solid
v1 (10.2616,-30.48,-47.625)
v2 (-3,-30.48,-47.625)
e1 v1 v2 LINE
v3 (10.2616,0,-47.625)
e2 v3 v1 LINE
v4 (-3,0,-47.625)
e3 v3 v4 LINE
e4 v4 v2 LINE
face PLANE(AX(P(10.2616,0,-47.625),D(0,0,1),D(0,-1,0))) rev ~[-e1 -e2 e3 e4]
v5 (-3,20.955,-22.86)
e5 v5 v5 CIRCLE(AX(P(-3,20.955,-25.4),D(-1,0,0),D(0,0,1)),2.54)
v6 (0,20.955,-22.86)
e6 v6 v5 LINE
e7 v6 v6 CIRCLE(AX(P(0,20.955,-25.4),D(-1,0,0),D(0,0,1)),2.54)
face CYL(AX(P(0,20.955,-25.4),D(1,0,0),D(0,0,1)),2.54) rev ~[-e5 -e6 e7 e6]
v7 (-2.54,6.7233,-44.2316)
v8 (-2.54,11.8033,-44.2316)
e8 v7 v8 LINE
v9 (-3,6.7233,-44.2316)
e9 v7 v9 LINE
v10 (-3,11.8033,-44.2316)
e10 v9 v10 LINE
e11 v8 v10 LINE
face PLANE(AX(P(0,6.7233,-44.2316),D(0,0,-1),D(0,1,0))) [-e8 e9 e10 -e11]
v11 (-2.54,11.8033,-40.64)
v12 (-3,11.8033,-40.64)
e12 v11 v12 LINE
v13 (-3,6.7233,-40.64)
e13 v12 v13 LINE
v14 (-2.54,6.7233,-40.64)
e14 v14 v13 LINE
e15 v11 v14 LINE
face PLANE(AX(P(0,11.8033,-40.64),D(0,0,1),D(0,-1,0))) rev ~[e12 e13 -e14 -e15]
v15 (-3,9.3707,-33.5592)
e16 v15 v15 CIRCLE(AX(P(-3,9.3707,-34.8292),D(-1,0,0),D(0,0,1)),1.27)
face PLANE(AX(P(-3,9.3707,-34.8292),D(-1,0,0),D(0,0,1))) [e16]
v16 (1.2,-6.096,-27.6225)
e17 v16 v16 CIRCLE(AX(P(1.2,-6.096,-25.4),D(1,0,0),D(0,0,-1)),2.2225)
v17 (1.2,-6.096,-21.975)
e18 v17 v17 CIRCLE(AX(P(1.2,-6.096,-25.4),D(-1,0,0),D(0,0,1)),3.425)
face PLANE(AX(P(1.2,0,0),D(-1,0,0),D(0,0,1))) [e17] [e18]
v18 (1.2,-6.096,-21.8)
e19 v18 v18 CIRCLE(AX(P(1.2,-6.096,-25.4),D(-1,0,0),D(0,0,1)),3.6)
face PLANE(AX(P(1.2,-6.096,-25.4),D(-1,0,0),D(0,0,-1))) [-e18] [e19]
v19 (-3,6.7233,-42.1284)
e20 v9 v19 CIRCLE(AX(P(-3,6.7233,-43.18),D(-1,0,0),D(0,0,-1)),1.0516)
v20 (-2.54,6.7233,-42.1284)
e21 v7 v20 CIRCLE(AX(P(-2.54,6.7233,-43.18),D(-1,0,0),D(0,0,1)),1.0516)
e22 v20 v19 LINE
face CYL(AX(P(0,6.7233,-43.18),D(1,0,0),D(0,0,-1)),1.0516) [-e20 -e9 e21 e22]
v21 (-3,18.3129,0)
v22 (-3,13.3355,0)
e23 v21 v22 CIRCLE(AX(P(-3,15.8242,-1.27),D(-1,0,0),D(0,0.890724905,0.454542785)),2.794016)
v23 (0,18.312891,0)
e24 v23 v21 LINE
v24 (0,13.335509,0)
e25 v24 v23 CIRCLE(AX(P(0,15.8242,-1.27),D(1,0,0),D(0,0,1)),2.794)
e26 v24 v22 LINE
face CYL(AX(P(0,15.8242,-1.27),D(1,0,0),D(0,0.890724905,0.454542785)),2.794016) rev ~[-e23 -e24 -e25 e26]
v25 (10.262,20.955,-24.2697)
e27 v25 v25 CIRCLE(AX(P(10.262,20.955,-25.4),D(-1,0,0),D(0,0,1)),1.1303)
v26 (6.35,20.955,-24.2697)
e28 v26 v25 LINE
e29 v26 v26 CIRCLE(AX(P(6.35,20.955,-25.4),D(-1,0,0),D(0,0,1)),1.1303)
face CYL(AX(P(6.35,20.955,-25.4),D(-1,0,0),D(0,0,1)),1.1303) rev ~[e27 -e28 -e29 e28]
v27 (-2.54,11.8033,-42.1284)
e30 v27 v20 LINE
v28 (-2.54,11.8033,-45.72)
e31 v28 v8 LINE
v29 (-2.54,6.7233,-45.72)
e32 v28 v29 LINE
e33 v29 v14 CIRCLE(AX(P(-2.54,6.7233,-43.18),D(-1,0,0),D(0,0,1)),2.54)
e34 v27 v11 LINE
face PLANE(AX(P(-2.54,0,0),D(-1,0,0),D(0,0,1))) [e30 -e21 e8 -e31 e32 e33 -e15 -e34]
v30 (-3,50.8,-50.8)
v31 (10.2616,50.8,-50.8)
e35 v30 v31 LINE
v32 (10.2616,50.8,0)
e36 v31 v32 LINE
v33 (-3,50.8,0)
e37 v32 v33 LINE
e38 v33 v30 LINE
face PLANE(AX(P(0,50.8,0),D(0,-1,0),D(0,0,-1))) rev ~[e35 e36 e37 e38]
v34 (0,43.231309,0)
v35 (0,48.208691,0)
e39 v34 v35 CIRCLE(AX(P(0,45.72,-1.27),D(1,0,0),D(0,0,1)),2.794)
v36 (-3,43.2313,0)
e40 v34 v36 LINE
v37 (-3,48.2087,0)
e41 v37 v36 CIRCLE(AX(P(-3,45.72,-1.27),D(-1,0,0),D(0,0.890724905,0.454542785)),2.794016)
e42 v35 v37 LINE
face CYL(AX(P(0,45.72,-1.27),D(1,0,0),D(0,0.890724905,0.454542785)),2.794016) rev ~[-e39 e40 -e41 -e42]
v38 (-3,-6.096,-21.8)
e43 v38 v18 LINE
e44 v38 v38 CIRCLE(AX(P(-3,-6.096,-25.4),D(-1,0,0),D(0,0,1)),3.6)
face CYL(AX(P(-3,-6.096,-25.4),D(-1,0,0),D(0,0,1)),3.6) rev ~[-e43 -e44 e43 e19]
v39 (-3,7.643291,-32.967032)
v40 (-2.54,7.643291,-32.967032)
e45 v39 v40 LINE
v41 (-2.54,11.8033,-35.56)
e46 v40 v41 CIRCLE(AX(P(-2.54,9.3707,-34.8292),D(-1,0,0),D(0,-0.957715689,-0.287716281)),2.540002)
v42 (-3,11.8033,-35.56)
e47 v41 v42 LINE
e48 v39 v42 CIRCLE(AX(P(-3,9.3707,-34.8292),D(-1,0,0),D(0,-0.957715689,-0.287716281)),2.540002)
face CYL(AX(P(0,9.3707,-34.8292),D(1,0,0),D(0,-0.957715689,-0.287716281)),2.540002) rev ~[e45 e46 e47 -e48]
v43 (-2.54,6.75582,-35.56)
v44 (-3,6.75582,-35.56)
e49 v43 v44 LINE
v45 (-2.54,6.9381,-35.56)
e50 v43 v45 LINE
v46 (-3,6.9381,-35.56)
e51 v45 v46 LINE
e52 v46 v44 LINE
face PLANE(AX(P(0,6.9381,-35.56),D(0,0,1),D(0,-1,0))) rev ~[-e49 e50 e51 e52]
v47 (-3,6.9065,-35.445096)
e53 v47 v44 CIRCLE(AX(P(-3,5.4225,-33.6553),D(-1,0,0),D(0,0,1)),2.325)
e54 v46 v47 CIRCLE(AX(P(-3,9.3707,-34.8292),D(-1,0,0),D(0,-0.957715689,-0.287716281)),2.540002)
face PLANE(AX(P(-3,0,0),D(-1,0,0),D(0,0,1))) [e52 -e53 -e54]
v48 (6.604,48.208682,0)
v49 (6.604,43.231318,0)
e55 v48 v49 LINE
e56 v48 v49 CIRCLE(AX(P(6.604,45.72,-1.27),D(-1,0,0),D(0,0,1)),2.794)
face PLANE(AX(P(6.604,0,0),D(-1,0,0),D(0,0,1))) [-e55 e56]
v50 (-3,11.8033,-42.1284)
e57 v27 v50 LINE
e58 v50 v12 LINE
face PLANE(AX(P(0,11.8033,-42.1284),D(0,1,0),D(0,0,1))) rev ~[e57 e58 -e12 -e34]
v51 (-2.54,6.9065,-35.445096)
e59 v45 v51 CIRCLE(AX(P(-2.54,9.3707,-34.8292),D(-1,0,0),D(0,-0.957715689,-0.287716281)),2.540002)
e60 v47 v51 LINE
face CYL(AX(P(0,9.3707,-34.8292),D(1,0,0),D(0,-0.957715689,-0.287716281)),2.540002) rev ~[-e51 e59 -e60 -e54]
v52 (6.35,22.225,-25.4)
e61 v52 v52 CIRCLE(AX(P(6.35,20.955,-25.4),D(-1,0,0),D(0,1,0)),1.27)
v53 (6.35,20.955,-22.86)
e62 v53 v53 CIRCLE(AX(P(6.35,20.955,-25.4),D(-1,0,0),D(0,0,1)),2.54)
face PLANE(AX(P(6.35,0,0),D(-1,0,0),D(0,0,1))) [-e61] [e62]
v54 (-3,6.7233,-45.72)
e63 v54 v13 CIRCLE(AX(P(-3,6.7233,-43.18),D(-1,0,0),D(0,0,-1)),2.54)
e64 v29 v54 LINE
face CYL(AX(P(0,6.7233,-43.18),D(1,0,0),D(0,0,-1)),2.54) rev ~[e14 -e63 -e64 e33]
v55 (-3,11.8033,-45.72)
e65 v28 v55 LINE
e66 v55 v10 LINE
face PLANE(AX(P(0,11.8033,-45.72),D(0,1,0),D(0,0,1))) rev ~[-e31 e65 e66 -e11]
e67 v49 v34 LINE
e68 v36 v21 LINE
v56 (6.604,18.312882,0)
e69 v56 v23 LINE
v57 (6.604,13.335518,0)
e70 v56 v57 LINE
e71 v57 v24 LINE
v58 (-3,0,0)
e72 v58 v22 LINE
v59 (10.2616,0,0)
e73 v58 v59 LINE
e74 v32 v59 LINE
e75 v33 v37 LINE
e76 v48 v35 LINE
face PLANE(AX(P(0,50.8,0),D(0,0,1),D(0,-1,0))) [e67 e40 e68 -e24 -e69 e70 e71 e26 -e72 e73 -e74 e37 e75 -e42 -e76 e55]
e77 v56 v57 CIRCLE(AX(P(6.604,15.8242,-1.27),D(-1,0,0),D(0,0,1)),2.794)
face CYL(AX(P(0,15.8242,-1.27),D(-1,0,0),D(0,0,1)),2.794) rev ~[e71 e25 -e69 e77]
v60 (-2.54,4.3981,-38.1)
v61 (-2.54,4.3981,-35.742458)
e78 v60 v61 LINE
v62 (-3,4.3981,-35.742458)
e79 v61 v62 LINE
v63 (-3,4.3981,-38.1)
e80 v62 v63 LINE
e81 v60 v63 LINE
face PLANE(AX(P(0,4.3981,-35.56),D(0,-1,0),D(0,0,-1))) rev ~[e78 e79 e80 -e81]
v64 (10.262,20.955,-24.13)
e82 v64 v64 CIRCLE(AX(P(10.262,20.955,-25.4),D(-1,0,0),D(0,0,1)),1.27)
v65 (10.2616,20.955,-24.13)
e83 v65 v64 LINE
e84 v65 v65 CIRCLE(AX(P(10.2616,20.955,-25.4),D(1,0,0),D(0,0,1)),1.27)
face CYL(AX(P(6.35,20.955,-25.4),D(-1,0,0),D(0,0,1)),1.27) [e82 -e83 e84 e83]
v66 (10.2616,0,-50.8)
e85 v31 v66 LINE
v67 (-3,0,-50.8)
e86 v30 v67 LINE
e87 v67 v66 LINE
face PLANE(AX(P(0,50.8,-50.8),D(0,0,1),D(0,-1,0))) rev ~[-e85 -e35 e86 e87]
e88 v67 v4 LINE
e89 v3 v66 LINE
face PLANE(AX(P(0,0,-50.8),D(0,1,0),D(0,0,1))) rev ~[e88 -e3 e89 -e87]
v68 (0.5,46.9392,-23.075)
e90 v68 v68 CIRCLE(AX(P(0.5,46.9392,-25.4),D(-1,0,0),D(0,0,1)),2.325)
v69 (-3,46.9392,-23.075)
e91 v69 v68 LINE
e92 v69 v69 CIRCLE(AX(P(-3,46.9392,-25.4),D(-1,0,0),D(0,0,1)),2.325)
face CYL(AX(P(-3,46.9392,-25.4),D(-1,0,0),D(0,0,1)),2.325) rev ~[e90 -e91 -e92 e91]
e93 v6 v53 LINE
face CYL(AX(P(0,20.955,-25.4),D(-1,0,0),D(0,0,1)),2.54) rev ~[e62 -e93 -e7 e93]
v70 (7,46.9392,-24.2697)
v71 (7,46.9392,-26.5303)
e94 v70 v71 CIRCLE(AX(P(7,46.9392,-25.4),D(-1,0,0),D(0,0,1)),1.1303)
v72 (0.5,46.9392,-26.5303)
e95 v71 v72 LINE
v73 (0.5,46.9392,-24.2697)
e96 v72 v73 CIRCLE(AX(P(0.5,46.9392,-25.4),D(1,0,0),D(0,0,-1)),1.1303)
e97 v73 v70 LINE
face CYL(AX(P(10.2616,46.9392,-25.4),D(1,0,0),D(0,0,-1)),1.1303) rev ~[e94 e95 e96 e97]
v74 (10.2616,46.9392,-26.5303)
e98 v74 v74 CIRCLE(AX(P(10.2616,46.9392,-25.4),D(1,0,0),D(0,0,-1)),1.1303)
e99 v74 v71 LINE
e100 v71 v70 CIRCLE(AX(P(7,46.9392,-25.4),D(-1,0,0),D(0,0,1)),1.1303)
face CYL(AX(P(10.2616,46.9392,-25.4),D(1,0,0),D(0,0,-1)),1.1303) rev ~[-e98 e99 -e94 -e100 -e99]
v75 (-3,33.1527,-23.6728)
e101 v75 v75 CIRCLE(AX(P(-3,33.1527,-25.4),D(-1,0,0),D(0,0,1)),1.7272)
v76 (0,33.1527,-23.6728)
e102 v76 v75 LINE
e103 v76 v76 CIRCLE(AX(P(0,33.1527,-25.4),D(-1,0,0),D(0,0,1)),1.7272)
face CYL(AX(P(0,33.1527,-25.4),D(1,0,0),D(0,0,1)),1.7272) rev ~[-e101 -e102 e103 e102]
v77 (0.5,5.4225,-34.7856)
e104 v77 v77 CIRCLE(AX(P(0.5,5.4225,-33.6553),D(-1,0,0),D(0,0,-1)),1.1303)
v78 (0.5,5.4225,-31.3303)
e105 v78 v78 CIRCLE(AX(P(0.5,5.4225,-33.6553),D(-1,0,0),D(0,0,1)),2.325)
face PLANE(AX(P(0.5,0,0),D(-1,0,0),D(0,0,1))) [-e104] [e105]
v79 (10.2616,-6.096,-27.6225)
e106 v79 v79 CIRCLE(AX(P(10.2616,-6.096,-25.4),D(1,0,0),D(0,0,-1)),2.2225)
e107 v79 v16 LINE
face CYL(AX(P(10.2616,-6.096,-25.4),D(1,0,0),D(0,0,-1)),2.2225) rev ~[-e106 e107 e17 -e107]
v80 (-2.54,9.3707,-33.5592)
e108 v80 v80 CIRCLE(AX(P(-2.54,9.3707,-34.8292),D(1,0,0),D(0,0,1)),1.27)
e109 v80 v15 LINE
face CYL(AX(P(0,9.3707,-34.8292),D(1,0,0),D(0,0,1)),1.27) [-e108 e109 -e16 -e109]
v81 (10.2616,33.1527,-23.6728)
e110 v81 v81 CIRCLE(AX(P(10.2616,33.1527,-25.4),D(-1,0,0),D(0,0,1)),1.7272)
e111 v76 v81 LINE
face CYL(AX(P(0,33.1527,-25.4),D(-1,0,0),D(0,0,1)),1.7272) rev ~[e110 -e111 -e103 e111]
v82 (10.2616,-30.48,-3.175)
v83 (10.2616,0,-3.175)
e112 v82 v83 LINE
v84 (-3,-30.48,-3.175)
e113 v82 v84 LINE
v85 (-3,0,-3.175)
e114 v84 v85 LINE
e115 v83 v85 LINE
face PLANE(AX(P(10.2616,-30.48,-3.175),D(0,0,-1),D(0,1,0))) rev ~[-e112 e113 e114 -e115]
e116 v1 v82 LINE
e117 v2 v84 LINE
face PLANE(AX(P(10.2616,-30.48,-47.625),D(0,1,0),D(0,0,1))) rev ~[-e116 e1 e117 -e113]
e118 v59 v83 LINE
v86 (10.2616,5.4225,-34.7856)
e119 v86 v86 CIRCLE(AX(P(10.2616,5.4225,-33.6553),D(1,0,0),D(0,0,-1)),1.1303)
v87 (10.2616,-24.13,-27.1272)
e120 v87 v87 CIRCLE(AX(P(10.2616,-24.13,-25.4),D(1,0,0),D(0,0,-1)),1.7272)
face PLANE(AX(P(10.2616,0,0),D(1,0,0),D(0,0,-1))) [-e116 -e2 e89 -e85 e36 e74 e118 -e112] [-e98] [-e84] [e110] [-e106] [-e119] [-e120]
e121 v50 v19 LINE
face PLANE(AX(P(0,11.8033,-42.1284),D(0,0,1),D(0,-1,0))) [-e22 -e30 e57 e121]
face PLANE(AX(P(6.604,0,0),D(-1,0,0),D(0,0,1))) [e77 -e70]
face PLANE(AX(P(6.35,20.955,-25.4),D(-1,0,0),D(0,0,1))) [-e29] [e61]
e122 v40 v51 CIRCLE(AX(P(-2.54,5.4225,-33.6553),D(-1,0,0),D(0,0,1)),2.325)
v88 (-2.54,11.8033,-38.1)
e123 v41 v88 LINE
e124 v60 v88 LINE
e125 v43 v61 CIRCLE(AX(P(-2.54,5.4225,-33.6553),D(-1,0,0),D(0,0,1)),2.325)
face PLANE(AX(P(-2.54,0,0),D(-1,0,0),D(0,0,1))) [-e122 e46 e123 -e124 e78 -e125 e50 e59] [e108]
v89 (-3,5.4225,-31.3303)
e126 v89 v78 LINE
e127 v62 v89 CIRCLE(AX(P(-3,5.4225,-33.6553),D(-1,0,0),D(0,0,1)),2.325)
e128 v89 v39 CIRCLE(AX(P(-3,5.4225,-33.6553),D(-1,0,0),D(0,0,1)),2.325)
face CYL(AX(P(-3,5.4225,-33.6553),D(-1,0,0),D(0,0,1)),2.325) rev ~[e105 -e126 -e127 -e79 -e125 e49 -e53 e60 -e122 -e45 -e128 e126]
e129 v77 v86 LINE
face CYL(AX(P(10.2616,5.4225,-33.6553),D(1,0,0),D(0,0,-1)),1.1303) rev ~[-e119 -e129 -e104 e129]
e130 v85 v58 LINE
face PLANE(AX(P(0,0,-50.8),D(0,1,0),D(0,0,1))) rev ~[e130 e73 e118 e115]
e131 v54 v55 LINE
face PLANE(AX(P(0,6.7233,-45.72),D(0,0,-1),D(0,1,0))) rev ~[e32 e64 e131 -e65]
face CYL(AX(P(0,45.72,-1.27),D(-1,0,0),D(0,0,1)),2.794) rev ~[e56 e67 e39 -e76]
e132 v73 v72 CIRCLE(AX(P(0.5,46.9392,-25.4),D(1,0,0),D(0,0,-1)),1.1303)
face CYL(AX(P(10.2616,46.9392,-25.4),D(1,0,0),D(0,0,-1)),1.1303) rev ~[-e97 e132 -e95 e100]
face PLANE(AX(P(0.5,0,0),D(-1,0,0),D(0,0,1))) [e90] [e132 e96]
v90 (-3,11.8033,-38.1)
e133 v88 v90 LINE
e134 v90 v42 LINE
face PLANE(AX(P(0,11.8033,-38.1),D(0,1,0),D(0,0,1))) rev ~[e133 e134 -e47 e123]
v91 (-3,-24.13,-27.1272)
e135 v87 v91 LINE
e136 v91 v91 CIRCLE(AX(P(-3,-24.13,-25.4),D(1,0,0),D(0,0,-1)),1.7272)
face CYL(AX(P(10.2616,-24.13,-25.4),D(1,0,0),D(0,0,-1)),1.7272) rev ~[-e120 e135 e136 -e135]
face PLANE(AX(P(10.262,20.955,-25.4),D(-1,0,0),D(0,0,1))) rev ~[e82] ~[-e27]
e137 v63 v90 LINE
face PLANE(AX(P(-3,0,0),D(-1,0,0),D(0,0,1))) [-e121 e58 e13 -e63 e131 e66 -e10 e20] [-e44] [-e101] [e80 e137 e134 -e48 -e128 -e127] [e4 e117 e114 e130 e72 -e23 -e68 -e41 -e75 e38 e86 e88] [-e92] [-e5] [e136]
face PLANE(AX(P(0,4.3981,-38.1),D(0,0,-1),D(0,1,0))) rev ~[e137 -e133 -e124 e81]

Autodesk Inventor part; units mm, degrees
ref_plane "YZ Plane" through (0, 0, 0) normal (1, 0, 0) x (0, 1, 0)
ref_plane "XZ Plane" through (0, 0, 0) normal (0, 1, 0) x (-1, 0, 0)
ref_plane "XY Plane" through (0, 0, 0) normal (0, 0, 1) x (1, 0, 0)
sketch "Sketch1" plane through (0, 0, 0) normal (1, 0, 0) x (0, 1, 0)
  line L0 (0, 0) -> (50.8, 0)
  line L1 (50.8, 0) -> (50.8, -50.8)
  line L2 (50.8, -50.8) -> (0, -50.8)
  line L3 (0, -50.8) -> (0, 0)
  circle A0 centre (46.9392, -25.4) radius 0.889
  circle A1 centre (20.955, -25.4) radius 1.27
  line L4 (20.955, -25.4) -> (20.955, -50.8) construction
  line L5 (46.9392, -25.4) -> (46.9392, -50.8) construction
  line L6 (20.955, -25.4) -> (50.8, -25.4) construction
  line L7 (46.9392, -25.4) -> (50.8, -25.4) construction
  dimension "d0" = 50.8
  dimension "d2" = 50.8
  dimension "d3" = 25.4
  dimension "d4" = 25.4
  dimension "d5" = 29.845
  dimension "d6" = 3.8608
  dimension "d7" = 2.54
  dimension "d8" = 1.778
extrude "Extrusion1" add sketch "Sketch1" along normal blind 12.7
sketch "Sketch2" plane through (0, 0, -50.8) normal (0, -1, 0) x (1, 0, 0)
  line L0 (0, 0) -> (12.7, 0) projected
  line L1 (0, 50.8) -> (12.7, 50.8) projected
  line L2 (6.35, 50.8) -> (6.35, 40.4) construction
  line L3 (6.35, 0) -> (6.35, 10.4) construction
  circle A0 centre (6.35, 10.4) radius 3.175
  circle A1 centre (6.35, 40.4) radius 3.175
  line L4 (12.7, 50.8) -> (12.7, 0) projected
  line L5 (6.35, 40.4) -> (6.35, 10.4) construction
  dimension "d14" = 6.35
  dimension "d15" = 6.35
  dimension "d77" = 30
extrude "Extrusion2" [suppressed]
sketch "Sketch4" plane through (0, 0, 0) normal (-1, 0, 0) x (0, 0, 1)
  line L0 (0, 0) -> (0, 50.8) projected
  line L1 (0, 50.8) -> (0, 45.72) construction
  line L2 (0, 45.72) -> (-1.27, 45.72) construction
  circle A0 centre (-1.27, 45.72) radius 2.794
  line L3 (-1.27, 45.72) -> (-1.27, 15.8242) construction
  circle A1 centre (-1.27, 15.8242) radius 2.794
  dimension "d23" = 5.08
  dimension "d24" = 1.27
  dimension "d25" = 5.588
  dimension "d26" = 29.8958
  dimension "d27" = 5.588
extrude "Extrusion4" cut sketch "Sketch4" against normal blind 6.604
sketch "Sketch5" plane through (0, 0, 0) normal (-1, 0, 0) x (0, 0, 1)
  line L0 (0, 48.2087) -> (0, 50.8) projected
  line L1 (0, 50.8) -> (-50.8, 50.8) projected
  line L2 (0, 18.3129) -> (0, 43.2313) projected
  line L3 (-50.8, -12.7) -> (0, -12.7)
  line L4 (0, -12.7) -> (0, 50.8)
  line L5 (0, 50.8) -> (-50.8, 50.8)
  line L6 (-50.8, 50.8) -> (-50.8, -12.7)
  line L7 (-38.1, 4.3981) -> (-38.1, 11.8033)
  line L8 (-38.1, 4.3981) -> (-35.56, 4.3981)
  line L9 (-35.56, 4.3981) -> (-35.56, 6.9381)
  arc A0 (-35.56, 6.9381) -> (-35.56, 11.8033) centre (-34.8292, 9.3707) ccw
  line L10 (-35.56, 11.8033) -> (-38.1, 11.8033)
  line L11 (-45.72, 11.8033) -> (-45.72, 6.7233)
  line L12 (-45.72, 11.8033) -> (-40.64, 11.8033)
  line L13 (-40.64, 11.8033) -> (-40.64, 6.7233)
  circle A1 centre (-43.18, 6.7233) radius 2.54
  line L14 (-50.8, -7.7566) -> (-38.1, -7.7566) construction
  line L15 (-50.8, -3.6438) -> (-45.72, -3.6438) construction
  line L16 (-40.64, 6.7233) -> (-45.72, 6.7233) construction
  line L17 (-45.72, 11.8033) -> (-40.64, 11.8033)
  arc A2 (-40.64, 6.7233) -> (-45.72, 6.7233) centre (-43.18, 6.7233) ccw
  circle A3 centre (-25.4, 20.955) radius 1.27 projected
  circle A4 centre (-43.18, 7.6582) radius 0.935
  line L18 (-42.245, 7.6582) -> (-42.245, 11.8033)
  line L19 (-42.245, 11.8033) -> (-44.115, 11.8033)
  line L20 (-44.115, 11.8033) -> (-44.115, 7.6582)
  line L21 (-44.115, 11.8033) -> (-42.245, 11.8033)
  circle A5 centre (-34.8292, 9.3707) radius 1.27
  line L22 (-50.8, 0) -> (0, 0) projected
  dimension "d46" = 12.7
  dimension "d47" = 5.08
  dimension "d48" = 5.08
  dimension "d49" = 2.54
  dimension "d50" = 2.54
  dimension "d52" = 2.54
  dimension "d53" = 5.08
  dimension "d57" = 58.5566
  dimension "d58" = 54.4438
  dimension "d59" = 35.56
  dimension "d60" = 0
  dimension "d61" = 63.5
  dimension "d62" = 0
  dimension "d64" = 38.1
  dimension "d67" = 1.8699
  dimension "d80" = 11.8033
  dimension "d81" = 4.3981
  dimension "d82" = 11.8033
extrude "Extrusion5" add sketch "Sketch5" along normal blind 2.54 contours L7 L10 A0 L9 L8 | L12 L20 A1 L11 | A1 L20 A4 L18 | L12 L18 A1 L20 | A1 L18 L12 L13 | A1 L18 A4 L20 | A4 | A5
sketch "Sketch6" plane through (-2.54, 0, 0) normal (-1, 0, 0) x (0, 0, 1)
  arc A0 (-35.56, 6.9381) -> (-35.56, 11.8033) centre (-34.8292, 9.3707) ccw projected
  line L0 (-35.56, 11.8033) -> (-38.1, 11.8033) projected
  circle A1 centre (-34.8292, 9.3707) radius 1.27
  line L1 (-35.56, 11.8033) -> (-35.56, 6.9381)
  point P0 (0, 0)
  dimension "d68" = 2.54
extrude "Extrusion6" cut sketch "Sketch6" against normal blind 2.54 contours L1 A1 | A1 L1
sketch "Sketch7" plane through (-2.54, 0, 0) normal (-1, 0, 0) x (0, 0, 1)
  arc A0 (-45.72, 6.7233) -> (-40.64, 6.7233) centre (-43.18, 6.7233) ccw projected
  line L0 (-40.64, 11.8033) -> (-45.72, 11.8033) projected
  line L1 (-44.2316, 11.8033) -> (-42.1284, 11.8033)
  line L2 (-42.1284, 11.8033) -> (-42.1284, 6.7233)
  line L3 (-42.1284, 6.7233) -> (-44.2316, 6.7233)
  line L4 (-44.2316, 6.7233) -> (-44.2316, 11.8033)
  circle A1 centre (-43.18, 6.7233) radius 1.0516
  point P0 (0, 0)
  dimension "d71" = 2.1033
extrude "Extrusion7" cut sketch "Sketch7" against normal blind 2.54
sketch "Sketch8" plane through (12.7, 0, 0) normal (1, 0, 0) x (0, 0, -1)
  circle A0 centre (25.4, 20.955) radius 1.27 projected
  circle A1 centre (25.4, 46.9392) radius 0.889 projected
  line L0 (0, 50.8) -> (0, 0) projected
  line L1 (0, 0) -> (50.8, 0) projected
  line L2 (0, 50.8) -> (50.8, 50.8)
  line L3 (50.8, 50.8) -> (50.8, 0)
  line L4 (50.8, 0) -> (0, 0)
  line L5 (0, 0) -> (0, 50.8)
extrude "Extrusion8" cut sketch "Sketch8" against normal blind 2.4384
sketch "Sketch9" plane through (10.2616, 0, 0) normal (1, 0, 0) x (0, 0, -1)
  circle A0 centre (25.4, 20.955) radius 1.27 projected
  circle A1 centre (25.4, 46.9392) radius 0.889 projected
  line L0 (0, 0) -> (0, 50.8) projected
  line L1 (50.8, 0) -> (0, 0) projected
  line L2 (50.8, 50.8) -> (50.8, 0) projected
  line L3 (0, 50.8) -> (50.8, 50.8) projected
  circle A2 centre (25.4, 46.9392) radius 0.889
sketch "Sketch12" plane through (0, 50.8, 0) normal (0, 1, 0) x (1, 0, 0)
  line L0 (10.2616, 0) -> (10.2616, 50.8) projected
  line L1 (10.2616, 15.875) -> (10.2616, 34.925)
  line L2 (10.2616, 34.925) -> (0, 34.925)
  line L3 (0, 34.925) -> (0, 15.875)
  line L4 (0, 15.875) -> (10.2616, 15.875)
  line L5 (10.2616, 15.875) -> (0, 34.925) construction
  line L6 (10.2616, 34.925) -> (0, 15.875) construction
  point P0 (5.1308, 25.4)
  dimension "d84" = 19.05
extrude "Extrusion9" add sketch "Sketch12" along normal blind 25.4
sketch "Sketch14" plane through (0, 0, 0) normal (-1, 0, 0) x (0, 0, 1)
  line L0 (-44.2316, 6.7233) -> (-44.2316, 11.8033) projected
  line L1 (-22.86, 55.5625) -> (-22.86, 71.4375)
  line L2 (-22.86, 71.4375) -> (-27.94, 71.4375)
  line L3 (-27.94, 71.4375) -> (-27.94, 55.5625)
  line L4 (-27.94, 55.5625) -> (-22.86, 55.5625)
  line L5 (-22.86, 55.5625) -> (-27.94, 71.4375) construction
  line L6 (-22.86, 71.4375) -> (-27.94, 55.5625) construction
  circle A0 centre (-25.4, 71.4375) radius 2.54
  circle A1 centre (-25.4, 55.5625) radius 2.54
  line L7 (-15.875, 50.8) -> (-15.875, 76.2) projected
  point P0 (-25.4, 63.5)
  dimension "d87" = 5.08
  dimension "d88" = 15.875
  dimension "d91" = 9.525
extrude "Extrusion10" cut sketch "Sketch14" against normal blind 25.4
sketch "Sketch15" plane through (0, 0, 0) normal (-1, 0, 0) x (0, 0, 1)
  circle A0 centre (-25.4, 20.955) radius 1.27 projected
  circle A1 centre (-25.4, 20.955) radius 2.54
  dimension "d92" = 5.08
extrude "Extrusion11" cut sketch "Sketch15" against normal blind 6.35
sketch "Sketch16" plane through (10.2616, 0, 0) normal (1, 0, 0) x (0, 0, -1)
  circle A0 centre (25.4, 20.955) radius 1.27 projected
  circle A1 centre (25.4, 46.9392) radius 0.889 projected
  circle A2 centre (33.6553, 5.4225) radius 0.889
  dimension "d99" = 17.59
  dimension "d100" = 1.778
  dimension "d103" = 207.99
extrude "Extrusion12" cut sketch "Sketch16" against normal up to next contours A2
sketch "Sketch17" plane through (0, 0, 0) normal (-1, 0, 0) x (0, 0, 1)
  circle A0 centre (-33.6553, 5.4225) radius 0.889 projected
  circle A1 centre (-25.4, 20.955) radius 2.54 projected
  line L0 (-22.86, 71.4375) -> (-22.86, 55.5625) projected
  arc A2 (-27.94, 55.5625) -> (-22.86, 55.5625) centre (-25.4, 55.5625) ccw projected
  line L1 (-27.94, 55.5625) -> (-27.94, 71.4375) projected
  arc A3 (-22.86, 71.4375) -> (-27.94, 71.4375) centre (-25.4, 71.4375) ccw projected
  line L2 (-45.72, 11.8033) -> (-44.2316, 11.8033) projected
  line L3 (-44.2316, 6.7233) -> (-44.2316, 11.8033) projected
  arc A4 (-44.2316, 6.7233) -> (-42.1284, 6.7233) centre (-43.18, 6.7233) ccw projected
  line L4 (-42.1284, 11.8033) -> (-42.1284, 6.7233) projected
  line L5 (-42.1284, 11.8033) -> (-40.64, 11.8033) projected
  line L6 (-40.64, 11.8033) -> (-40.64, 6.7233) projected
  arc A5 (-45.72, 6.7233) -> (-40.64, 6.7233) centre (-43.18, 6.7233) ccw projected
  line L7 (-45.72, 6.7233) -> (-45.72, 11.8033) projected
  line L8 (-38.1, 11.8033) -> (-35.56, 11.8033) projected
  arc A6 (-35.56, 6.9381) -> (-35.56, 11.8033) centre (-34.8292, 9.3707) ccw projected
  line L9 (-35.56, 6.9381) -> (-35.56, 4.3981) projected
  line L10 (-35.56, 4.3981) -> (-38.1, 4.3981) projected
  line L11 (-38.1, 4.3981) -> (-38.1, 11.8033) projected
  arc A7 (0, 48.2087) -> (0, 43.2313) centre (-1.27, 45.72) ccw projected
  line L12 (0, 50.8) -> (-15.875, 50.8) projected
  line L13 (-34.925, 50.8) -> (-34.925, 76.2) projected
  line L14 (-34.925, 50.8) -> (-50.8, 50.8) projected
  line L15 (-50.8, 50.8) -> (-50.8, 0) projected
  line L16 (-50.8, 0) -> (0, 0) projected
  line L17 (0, 0) -> (0, 13.3355) projected
  arc A8 (0, 18.3129) -> (0, 13.3355) centre (-1.27, 15.8242) ccw projected
  circle A9 centre (-25.4, 46.9392) radius 0.889 projected
  line L18 (-34.925, 50.8) -> (-34.925, 76.2)
  line L19 (-15.875, 76.2) -> (-34.925, 76.2)
  line L20 (-15.875, 76.2) -> (-15.875, 50.8)
  line L21 (-15.875, 50.8) -> (0, 50.8)
  line L22 (0, 50.8) -> (0, 48.2087)
  arc A10 (0, 48.2087) -> (0, 43.2313) centre (-1.27, 45.72) ccw
  arc A11 (0, 18.3129) -> (0, 13.3355) centre (-1.27, 15.8242) ccw
  line L23 (0, 43.2313) -> (0, 18.3129)
  line L24 (0, 13.3355) -> (0, 0)
  line L25 (0, 0) -> (-50.8, 0)
  line L26 (-50.8, 0) -> (-50.8, 50.8)
  line L27 (-50.8, 50.8) -> (-34.925, 50.8)
  circle A12 centre (-25.4, 46.9392) radius 0.889
  circle A13 centre (-25.4, 20.955) radius 2.54
  circle A14 centre (-25.4, 33.1527) radius 1.7272
  dimension "d104" = 3.4544
extrude "Extrusion13" add sketch "Sketch17" along normal blind 3
sketch "Sketch18" plane through (0, 33.1527, -25.4) normal (-1, 0, 0) x (0, 0, 1)
  circle A0 centre (0, 0) radius 1.7272 projected
  circle A1 centre (0, 0) radius 1.7272
  point P0 (25.4, -33.1527)
extrude "Extrusion14" cut sketch "Sketch18" against normal up to surface (10.2616 mm away)
sketch "Sketch20" plane through (10.2616, 0, 0) normal (1, 0, 0) x (0, 0, -1)
  circle A0 centre (25.4, 33.1527) radius 1.7272 projected
  circle A1 centre (25.4, -6.096) radius 2.2225
  line L0 (0, 0) -> (0, 50.8) projected
  line L1 (50.8, 0) -> (0, 0) projected
  line L2 (3.175, 0) -> (47.625, 0)
  line L3 (47.625, 0) -> (47.625, -30.48)
  line L4 (47.625, -30.48) -> (3.175, -30.48)
  line L5 (3.175, -30.48) -> (3.175, 0)
  dimension "d111" = 4.445
  dimension "d114" = 0
  dimension "d117" = 6.096
  dimension "d118" = 44.45
  dimension "d119" = 30.48
  dimension "d120" = 3.175
extrude "Extrusion16" add sketch "Sketch20" against normal up to surface (13.2616 mm away) contours L3 L4 L5 L1
sketch "Sketch21" plane through (10.2616, 0, 0) normal (1, 0, 0) x (0, 0, -1)
  line L0 (22.86, 55.5625) -> (22.86, 71.4375) projected
  arc A0 (27.94, 71.4375) -> (22.86, 71.4375) centre (25.4, 71.4375) ccw projected
  line L1 (27.94, 71.4375) -> (27.94, 55.5625) projected
  arc A1 (22.86, 55.5625) -> (27.94, 55.5625) centre (25.4, 55.5625) ccw projected
  line L2 (15.875, 50.8) -> (34.925, 50.8)
  line L3 (34.925, 50.8) -> (34.925, 76.2)
  line L4 (34.925, 76.2) -> (15.875, 76.2)
  line L5 (15.875, 76.2) -> (15.875, 50.8)
extrude "Extrusion17" cut sketch "Sketch21" against normal up to surface (13.2616 mm away)
sketch "Sketch22" plane through (0, 9.3707, -34.8292) normal (-1, 0, 0) x (0, 0, 1)
  circle A0 centre (0, 0) radius 1.27 projected
  circle A1 centre (0, 0) radius 1.27
  point P0 (34.8292, -9.3707)
extrude "Extrusion18" add sketch "Sketch22" along normal up to surface (3 mm away)
sketch "Sketch23" plane through (10.2616, 0, 0) normal (1, 0, 0) x (0, 0, -1)
  line L0 (47.625, -30.48) -> (3.175, -30.48) projected
  circle A0 centre (25.4, -24.13) radius 1.7272
  dimension "d127" = 3.4544
  dimension "d128" = 6.35
extrude "Extrusion19" cut sketch "Sketch23" against normal up to next
sketch "Sketch24" plane through (-3, 0, 0) normal (-1, 0, 0) x (0, 0, 1)
  circle A0 centre (-25.4, -6.096) radius 2.2225 projected
  circle A1 centre (-25.4, -6.096) radius 3.425
  point P0 (0, 0)
  dimension "d131" = 6.85
extrude "Extrusion20" cut sketch "Sketch24" against normal blind 4.2
thicken "Thicken1" operation add thickness 0.175 both sides no extend neighbours yes toward (0, -0.0804666, 0.9967573) faces at (-0.2, -6.3716, -21.9861)
sketch "Sketch26" plane through (6.35, 20.955, -25.4) normal (-1, 0, 0) x (0, 0, 1)
  circle A0 centre (0, 0) radius 1.1303
  circle A1 centre (0, 0) radius 1.27
  point P0 (25.4, -20.955)
  dimension "d159" = 2.2606
extrude "Extrusion23" add sketch "Sketch26" against normal blind 3.912
sketch "Sketch27" plane through (10.2616, 0, 0) normal (1, 0, 0) x (0, 0, -1)
  circle A0 centre (25.4, 46.9392) radius 0.889 projected
  circle A1 centre (25.4, 46.9392) radius 1.1303
  circle A2 centre (33.6553, 5.4225) radius 0.889 projected
  circle A3 centre (33.6553, 5.4225) radius 1.1303
  point P0 (0, 0)
  dimension "d162" = 2.2606
  dimension "d163" = 2.2606
extrude "Extrusion24" cut sketch "Sketch27" against normal blind 10 contours A0 | A1 | A2 | A3
sketch "Sketch28" plane through (-3, 0, 0) normal (-1, 0, 0) x (0, 0, 1)
  circle A0 centre (-33.6553, 5.4225) radius 1.1303 projected
  circle A1 centre (-33.6553, 5.4225) radius 2.325
  circle A2 centre (-25.4, 46.9392) radius 0.889 projected
  circle A3 centre (-25.4, 46.9392) radius 2.325
  point P0 (0, 0)
  dimension "d166" = 4.65
  dimension "d167" = 4.65
extrude "Extrusion25" cut sketch "Sketch28" against normal blind 3.5
sketch "Sketch29" plane through (-3, 0, 0) normal (-1, 0, 0) x (0, 0, 1)
  circle A0 centre (-33.6553, 5.4225) radius 0.889 projected
  circle A1 centre (-33.6553, 5.4225) radius 1.1303
  circle A2 centre (-25.4, 46.9392) radius 1.1303 projected
  circle A3 centre (-25.4, 46.9392) radius 1.1303
  point P0 (0, 0)
  dimension "d170" = 2.2606
  dimension "d171" = 2.2606
extrude "Extrusion26" cut sketch "Sketch29" against normal blind 10 contours A0 | A1 | A2
properties part number "mounting base"
